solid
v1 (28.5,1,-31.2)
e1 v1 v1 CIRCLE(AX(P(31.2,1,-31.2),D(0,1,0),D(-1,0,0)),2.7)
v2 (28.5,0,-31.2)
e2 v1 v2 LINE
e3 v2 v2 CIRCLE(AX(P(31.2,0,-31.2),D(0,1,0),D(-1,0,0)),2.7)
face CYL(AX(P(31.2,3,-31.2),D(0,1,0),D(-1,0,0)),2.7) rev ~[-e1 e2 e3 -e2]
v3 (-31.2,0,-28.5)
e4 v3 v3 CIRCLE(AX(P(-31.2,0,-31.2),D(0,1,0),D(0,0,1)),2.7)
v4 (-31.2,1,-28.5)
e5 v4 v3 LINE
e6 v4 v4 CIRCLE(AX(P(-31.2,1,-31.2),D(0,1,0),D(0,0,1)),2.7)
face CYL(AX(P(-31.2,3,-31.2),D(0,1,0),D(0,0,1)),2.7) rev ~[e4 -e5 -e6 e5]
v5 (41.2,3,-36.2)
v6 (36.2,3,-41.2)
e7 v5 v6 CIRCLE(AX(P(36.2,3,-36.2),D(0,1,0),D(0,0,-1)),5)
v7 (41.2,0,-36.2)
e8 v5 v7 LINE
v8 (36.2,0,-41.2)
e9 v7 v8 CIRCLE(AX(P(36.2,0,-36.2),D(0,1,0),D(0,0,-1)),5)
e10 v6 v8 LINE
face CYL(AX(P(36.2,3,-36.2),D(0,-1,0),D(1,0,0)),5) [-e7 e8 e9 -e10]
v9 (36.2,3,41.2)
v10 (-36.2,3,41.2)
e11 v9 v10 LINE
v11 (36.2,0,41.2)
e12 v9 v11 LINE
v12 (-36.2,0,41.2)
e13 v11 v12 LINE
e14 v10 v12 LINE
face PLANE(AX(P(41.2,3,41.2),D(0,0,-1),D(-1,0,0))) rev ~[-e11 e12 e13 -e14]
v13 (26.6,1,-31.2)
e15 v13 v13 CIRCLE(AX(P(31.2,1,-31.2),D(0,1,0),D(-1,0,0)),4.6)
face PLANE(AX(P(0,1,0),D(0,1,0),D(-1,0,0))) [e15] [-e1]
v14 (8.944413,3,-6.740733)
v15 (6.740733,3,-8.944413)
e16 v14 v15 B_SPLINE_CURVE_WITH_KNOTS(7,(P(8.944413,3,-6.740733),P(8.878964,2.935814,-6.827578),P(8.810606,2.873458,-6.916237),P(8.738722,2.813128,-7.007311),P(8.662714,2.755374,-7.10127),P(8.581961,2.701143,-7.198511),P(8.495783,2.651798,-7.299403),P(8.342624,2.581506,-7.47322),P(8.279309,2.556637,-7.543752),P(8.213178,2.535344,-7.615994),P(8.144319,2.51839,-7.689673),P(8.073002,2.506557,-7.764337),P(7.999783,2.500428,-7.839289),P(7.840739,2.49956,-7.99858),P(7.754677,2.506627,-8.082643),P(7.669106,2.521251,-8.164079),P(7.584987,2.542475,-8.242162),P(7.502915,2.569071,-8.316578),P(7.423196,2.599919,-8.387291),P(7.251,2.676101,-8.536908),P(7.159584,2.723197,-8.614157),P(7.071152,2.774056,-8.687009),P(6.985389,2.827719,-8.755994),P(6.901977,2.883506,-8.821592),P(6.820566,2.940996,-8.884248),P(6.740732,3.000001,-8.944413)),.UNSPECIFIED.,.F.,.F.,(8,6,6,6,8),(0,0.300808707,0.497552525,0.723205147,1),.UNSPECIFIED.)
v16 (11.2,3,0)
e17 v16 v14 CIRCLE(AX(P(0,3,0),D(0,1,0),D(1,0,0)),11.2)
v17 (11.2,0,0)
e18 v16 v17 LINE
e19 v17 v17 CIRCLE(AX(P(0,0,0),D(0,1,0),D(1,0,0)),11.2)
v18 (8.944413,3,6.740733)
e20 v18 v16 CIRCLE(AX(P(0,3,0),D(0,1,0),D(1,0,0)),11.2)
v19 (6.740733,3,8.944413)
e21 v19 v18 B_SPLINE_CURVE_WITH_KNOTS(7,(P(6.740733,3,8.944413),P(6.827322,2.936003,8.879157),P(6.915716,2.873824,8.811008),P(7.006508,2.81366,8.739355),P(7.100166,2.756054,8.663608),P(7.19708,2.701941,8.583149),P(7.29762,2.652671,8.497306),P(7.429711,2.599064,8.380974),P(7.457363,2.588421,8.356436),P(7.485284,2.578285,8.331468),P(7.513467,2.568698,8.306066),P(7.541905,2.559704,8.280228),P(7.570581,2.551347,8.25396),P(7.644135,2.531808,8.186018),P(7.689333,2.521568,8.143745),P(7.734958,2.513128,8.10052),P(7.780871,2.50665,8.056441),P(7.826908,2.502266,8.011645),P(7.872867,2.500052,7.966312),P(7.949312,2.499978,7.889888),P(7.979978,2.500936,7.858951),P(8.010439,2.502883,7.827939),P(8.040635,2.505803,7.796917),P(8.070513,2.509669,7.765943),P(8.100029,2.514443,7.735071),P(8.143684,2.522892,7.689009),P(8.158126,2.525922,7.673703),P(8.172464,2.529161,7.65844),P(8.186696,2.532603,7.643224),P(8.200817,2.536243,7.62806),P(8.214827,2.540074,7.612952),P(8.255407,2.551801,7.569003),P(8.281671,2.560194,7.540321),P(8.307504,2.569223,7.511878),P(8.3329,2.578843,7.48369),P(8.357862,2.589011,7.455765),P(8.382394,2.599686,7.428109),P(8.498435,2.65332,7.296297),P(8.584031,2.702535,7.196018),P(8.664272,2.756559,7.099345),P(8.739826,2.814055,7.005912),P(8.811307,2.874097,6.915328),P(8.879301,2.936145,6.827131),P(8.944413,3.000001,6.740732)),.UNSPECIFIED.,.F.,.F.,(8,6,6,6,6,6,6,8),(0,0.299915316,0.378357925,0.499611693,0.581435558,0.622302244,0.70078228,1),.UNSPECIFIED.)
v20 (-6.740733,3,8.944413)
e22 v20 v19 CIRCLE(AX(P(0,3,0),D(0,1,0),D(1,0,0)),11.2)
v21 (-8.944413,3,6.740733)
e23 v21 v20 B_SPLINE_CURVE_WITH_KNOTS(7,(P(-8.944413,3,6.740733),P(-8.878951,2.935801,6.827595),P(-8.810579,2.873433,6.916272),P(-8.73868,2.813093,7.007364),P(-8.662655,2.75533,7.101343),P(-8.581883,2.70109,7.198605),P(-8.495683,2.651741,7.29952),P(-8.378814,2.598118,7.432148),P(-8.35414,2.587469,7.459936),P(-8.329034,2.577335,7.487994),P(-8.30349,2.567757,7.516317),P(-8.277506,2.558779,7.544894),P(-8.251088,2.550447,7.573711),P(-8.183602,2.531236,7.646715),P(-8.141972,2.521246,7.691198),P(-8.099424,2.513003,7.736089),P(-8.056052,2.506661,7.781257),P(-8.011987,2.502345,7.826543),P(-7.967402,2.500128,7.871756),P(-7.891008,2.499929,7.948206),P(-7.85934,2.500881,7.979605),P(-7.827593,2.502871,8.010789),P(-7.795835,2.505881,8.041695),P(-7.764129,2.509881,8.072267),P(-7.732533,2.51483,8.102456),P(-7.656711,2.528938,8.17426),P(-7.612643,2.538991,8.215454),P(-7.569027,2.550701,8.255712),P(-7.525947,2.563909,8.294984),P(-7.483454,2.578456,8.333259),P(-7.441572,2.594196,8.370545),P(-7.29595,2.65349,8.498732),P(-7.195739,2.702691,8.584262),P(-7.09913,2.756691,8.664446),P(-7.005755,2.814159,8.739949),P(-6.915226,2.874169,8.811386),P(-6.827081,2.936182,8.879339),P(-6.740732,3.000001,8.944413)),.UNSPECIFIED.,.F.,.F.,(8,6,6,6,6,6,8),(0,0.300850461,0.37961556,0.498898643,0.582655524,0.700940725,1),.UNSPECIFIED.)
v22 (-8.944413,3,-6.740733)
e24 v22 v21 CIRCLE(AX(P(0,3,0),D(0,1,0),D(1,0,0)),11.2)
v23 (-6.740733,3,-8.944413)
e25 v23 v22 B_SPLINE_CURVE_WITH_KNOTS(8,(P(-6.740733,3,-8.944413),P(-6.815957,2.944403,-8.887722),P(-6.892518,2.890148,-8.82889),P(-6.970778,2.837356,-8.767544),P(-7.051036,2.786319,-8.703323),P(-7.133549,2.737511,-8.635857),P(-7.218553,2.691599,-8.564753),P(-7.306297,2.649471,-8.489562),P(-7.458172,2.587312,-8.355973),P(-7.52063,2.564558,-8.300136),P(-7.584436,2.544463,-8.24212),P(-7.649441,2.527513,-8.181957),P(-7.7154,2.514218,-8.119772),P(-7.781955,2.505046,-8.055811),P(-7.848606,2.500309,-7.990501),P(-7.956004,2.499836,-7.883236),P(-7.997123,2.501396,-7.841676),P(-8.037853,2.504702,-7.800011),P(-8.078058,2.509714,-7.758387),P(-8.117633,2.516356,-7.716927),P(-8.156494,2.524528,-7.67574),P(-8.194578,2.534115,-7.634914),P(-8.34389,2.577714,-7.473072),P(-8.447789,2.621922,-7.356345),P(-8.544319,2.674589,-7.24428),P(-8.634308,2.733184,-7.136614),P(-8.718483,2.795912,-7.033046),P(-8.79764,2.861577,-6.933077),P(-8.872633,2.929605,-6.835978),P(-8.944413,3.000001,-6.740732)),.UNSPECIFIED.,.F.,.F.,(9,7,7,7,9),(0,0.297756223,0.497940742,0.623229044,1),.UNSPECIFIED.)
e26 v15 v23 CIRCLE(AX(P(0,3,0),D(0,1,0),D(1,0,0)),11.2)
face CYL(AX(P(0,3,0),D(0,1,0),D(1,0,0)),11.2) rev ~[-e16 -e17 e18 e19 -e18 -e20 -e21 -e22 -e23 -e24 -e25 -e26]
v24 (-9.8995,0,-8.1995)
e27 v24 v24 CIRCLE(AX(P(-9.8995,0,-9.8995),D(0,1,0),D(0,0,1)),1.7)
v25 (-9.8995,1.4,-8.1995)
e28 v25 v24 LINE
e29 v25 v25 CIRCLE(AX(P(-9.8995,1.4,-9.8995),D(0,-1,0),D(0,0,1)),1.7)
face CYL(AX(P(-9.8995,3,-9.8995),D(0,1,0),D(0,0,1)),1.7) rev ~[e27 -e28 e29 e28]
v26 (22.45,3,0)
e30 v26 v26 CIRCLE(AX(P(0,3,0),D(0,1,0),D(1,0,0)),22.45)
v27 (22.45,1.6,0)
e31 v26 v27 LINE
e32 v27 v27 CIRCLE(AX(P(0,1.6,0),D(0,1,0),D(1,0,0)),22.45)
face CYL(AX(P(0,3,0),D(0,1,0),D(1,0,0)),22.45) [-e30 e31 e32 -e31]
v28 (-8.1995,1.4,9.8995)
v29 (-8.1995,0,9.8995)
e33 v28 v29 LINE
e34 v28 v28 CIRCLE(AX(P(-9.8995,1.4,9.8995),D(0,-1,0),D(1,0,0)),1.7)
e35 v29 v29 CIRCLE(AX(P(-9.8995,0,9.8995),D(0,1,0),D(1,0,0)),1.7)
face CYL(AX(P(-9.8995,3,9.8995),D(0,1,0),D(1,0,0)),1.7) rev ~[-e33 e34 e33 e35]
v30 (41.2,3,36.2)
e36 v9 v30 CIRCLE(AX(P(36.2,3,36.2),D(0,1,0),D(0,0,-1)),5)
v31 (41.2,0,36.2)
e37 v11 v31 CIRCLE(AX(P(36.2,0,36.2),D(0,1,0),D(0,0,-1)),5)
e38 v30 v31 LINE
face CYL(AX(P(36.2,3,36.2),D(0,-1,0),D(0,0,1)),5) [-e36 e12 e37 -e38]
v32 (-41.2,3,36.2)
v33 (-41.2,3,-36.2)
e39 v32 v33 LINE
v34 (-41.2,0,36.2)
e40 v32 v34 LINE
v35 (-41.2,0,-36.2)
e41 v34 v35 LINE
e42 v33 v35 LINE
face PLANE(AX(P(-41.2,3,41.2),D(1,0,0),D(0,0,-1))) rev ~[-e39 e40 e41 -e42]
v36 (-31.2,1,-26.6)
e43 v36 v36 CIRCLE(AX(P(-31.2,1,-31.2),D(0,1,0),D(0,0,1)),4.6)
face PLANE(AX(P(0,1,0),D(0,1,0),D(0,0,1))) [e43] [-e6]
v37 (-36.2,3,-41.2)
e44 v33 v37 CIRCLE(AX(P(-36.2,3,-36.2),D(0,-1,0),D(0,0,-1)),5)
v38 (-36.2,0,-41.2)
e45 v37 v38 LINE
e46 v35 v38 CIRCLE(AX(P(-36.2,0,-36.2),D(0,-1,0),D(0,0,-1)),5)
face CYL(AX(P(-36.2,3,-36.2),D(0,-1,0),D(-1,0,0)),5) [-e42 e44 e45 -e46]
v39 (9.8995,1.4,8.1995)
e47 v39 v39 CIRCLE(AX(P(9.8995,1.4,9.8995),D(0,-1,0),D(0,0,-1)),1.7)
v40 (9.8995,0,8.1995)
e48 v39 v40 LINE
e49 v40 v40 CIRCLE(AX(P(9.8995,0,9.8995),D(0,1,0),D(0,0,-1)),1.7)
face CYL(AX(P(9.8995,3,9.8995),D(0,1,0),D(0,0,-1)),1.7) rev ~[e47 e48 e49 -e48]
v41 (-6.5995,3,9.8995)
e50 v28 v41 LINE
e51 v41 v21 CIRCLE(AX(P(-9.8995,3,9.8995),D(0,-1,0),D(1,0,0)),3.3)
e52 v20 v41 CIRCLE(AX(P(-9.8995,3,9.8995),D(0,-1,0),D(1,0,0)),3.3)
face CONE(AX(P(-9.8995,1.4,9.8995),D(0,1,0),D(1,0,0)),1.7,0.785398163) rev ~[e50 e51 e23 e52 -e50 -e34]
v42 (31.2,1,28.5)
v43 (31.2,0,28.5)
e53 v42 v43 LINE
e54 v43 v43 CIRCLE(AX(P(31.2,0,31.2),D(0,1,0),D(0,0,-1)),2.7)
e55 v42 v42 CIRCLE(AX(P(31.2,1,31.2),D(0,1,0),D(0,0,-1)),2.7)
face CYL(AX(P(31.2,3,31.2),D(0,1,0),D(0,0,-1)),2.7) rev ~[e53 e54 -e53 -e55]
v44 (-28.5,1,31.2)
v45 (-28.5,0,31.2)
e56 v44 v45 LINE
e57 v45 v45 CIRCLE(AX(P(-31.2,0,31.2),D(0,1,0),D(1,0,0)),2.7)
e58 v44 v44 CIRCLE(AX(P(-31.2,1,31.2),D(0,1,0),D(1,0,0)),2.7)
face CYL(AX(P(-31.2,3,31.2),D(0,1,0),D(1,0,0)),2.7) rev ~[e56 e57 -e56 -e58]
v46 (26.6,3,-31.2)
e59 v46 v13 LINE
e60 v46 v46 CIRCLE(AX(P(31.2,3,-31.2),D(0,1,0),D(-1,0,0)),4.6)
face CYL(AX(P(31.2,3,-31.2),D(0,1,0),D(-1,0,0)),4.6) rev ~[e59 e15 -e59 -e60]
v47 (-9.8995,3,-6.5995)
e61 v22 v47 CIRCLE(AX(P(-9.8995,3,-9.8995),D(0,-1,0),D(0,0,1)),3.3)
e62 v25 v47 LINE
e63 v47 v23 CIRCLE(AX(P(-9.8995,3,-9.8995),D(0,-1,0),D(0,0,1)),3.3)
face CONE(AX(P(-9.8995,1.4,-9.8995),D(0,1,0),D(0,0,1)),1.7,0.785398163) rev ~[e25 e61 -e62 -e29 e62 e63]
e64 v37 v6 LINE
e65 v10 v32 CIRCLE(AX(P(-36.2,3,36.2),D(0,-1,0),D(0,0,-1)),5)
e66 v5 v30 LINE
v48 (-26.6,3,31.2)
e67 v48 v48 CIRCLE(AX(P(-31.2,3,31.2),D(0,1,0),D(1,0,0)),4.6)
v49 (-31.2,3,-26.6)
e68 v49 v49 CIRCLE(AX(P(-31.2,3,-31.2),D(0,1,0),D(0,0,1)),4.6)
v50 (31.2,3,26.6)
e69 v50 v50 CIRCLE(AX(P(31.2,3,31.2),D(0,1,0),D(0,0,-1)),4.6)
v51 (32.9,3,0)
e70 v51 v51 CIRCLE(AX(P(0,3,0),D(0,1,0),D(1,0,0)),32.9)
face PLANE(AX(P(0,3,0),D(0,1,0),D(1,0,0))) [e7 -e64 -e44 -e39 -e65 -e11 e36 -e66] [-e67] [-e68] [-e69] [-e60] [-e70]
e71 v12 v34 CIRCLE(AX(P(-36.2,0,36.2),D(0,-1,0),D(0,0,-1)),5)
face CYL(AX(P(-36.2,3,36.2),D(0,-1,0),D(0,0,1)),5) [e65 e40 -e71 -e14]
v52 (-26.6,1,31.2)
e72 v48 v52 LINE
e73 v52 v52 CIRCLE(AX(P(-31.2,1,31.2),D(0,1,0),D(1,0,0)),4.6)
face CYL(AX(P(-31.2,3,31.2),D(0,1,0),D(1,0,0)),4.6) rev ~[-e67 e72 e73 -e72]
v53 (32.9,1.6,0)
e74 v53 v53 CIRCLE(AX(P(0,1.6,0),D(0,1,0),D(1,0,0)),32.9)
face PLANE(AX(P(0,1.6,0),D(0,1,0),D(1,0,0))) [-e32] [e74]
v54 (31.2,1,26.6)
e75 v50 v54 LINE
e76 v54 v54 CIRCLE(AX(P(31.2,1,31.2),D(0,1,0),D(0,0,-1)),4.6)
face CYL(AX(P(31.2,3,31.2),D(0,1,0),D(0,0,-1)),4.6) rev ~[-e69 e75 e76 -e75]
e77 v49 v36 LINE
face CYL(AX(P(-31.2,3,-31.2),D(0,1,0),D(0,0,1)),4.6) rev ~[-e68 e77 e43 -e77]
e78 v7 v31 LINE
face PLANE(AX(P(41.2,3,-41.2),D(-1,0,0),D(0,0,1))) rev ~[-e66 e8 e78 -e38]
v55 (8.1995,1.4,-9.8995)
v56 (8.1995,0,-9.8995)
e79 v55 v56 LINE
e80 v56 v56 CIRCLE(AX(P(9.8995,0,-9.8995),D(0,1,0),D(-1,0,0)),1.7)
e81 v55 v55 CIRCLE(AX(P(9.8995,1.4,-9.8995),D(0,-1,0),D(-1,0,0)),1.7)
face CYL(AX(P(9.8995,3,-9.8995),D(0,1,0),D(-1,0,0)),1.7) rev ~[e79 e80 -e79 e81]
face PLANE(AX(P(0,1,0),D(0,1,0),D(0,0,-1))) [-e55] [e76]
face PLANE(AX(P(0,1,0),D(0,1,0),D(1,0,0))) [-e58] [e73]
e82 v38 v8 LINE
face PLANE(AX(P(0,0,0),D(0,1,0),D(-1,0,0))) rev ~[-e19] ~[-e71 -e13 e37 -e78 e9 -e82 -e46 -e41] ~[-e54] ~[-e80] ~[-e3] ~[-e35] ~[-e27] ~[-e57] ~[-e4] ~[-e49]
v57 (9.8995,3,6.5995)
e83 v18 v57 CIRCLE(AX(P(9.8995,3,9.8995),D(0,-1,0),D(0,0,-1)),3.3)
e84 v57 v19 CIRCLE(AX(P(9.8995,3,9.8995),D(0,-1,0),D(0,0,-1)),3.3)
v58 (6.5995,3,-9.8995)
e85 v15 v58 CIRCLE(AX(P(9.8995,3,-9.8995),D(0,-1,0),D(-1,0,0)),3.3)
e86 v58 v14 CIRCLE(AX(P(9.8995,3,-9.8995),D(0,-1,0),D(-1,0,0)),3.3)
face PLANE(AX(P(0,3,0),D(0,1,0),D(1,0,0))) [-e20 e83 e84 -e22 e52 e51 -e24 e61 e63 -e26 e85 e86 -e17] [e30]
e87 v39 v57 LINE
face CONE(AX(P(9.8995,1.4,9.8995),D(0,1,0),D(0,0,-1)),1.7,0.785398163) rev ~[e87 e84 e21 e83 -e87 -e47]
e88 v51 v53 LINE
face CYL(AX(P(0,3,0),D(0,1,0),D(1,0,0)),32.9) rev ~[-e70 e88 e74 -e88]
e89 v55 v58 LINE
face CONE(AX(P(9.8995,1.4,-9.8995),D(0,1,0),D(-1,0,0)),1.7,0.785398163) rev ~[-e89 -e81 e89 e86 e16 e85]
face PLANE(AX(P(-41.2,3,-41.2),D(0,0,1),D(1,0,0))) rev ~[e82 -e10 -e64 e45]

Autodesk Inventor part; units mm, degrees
ref_plane "YZ Plane" through (0, 0, 0) normal (1, 0, 0) x (0, 1, 0)
ref_plane "XZ Plane" through (0, 0, 0) normal (0, 1, 0) x (-1, 0, 0)
ref_plane "XY Plane" through (0, 0, 0) normal (0, 0, 1) x (1, 0, 0)
sketch "Boceto1" plane through (0, 0, 0) normal (0, 1, 0) x (-1, 0, 0)
  circle A0 centre (0, 0) radius 35
  dimension "d0" = 70
extrude "Extrusión1" add sketch "Boceto1" along normal blind 3
sketch "Boceto2" plane through (0, 3, 0) normal (0, 1, 0) x (1, 0, 0)
  circle A0 centre (0, 0) radius 22.45
  circle A1 centre (0, 0) radius 32.9
  dimension "d4" = 44.9
  dimension "d5" = 65.8
extrude "Extrusión2" cut sketch "Boceto2" against normal blind 1.4
sketch "Boceto3" plane through (0, 3, 0) normal (0, 1, 0) x (1, 0, 0)
  circle A0 centre (0, 0) radius 17.5
  dimension "d8" = 35
extrude "Extrusión3" cut sketch "Boceto3" against normal through all
sketch "Boceto4" plane through (0, 3, 0) normal (0, 1, 0) x (1, 0, 0)
  circle A0 centre (0, 0) radius 17.5 projected
  circle A1 centre (0, 0) radius 11.2
  line L0 (41.2, -41.2) -> (-41.2, -41.2)
  line L1 (-41.2, -41.2) -> (-41.2, 41.2)
  line L2 (-41.2, 41.2) -> (41.2, 41.2)
  line L3 (41.2, 41.2) -> (41.2, -41.2)
  line L4 (41.2, -41.2) -> (-41.2, 41.2) construction
  line L5 (-41.2, -41.2) -> (41.2, 41.2) construction
  circle A2 centre (0, 0) radius 35 projected
  dimension "d11" = 22.4
  dimension "d12" = 82.4
  dimension "d13" = 82.4
extrude "Extrusión4" add sketch "Boceto4" against normal up to surface (3 mm away)
sketch "Boceto5" plane through (0, 3, 0) normal (0, 1, 0) x (1, 0, 0)
  circle A0 centre (0, 0) radius 14
  circle A1 centre (-9.8995, -9.8995) radius 1.7
  line L0 (0, 0) -> (0, -14)
  line L1 (0, 0) -> (-9.8995, -9.8995)
  circle A2 centre (-31.2, -31.2) radius 2.7
  line L2 (-41.2, 41.2) -> (-41.2, -41.2) projected
  line L3 (-41.2, -41.2) -> (41.2, -41.2) projected
  dimension "d16" = 3.4
  dimension "d17" = 28
  dimension "d18" = 45
  dimension "d21" = 10
  dimension "d22" = 10
  dimension "d23" = 5.4
extrude "Extrusión5" cut sketch "Boceto5" against normal through all contours A1 A0 | A0 L1 A1 | A1 L1 A0 | A2
sketch "Boceto6" plane through (0, 3, 0) normal (0, 1, 0) x (1, 0, 0)
  circle A0 centre (-31.2, -31.2) radius 2.7 projected
  circle A1 centre (-31.2, -31.2) radius 4.6
  point P0 (0, 0)
  dimension "d24" = 9.2
extrude "Extrusión6" cut sketch "Boceto6" against normal blind 2
chamfer "Chaflán1" distance 1.6 angle 45 1 edges at (-11.5995, 3, 9.8995)
pattern_circular "Patrón circular1" count 4 over 360 about axis through (0, 3, 0) along (0, -1, 0) of "Extrusión5", "Extrusión6", "Chaflán1"
fillet "Empalme1" radius 5 4 edges at (-41.2, 1.5, 41.2) (41.2, 1.5, 41.2) (41.2, 1.5, -41.2) (-41.2, 1.5, -41.2)
properties part number "Motor Support Plate"
